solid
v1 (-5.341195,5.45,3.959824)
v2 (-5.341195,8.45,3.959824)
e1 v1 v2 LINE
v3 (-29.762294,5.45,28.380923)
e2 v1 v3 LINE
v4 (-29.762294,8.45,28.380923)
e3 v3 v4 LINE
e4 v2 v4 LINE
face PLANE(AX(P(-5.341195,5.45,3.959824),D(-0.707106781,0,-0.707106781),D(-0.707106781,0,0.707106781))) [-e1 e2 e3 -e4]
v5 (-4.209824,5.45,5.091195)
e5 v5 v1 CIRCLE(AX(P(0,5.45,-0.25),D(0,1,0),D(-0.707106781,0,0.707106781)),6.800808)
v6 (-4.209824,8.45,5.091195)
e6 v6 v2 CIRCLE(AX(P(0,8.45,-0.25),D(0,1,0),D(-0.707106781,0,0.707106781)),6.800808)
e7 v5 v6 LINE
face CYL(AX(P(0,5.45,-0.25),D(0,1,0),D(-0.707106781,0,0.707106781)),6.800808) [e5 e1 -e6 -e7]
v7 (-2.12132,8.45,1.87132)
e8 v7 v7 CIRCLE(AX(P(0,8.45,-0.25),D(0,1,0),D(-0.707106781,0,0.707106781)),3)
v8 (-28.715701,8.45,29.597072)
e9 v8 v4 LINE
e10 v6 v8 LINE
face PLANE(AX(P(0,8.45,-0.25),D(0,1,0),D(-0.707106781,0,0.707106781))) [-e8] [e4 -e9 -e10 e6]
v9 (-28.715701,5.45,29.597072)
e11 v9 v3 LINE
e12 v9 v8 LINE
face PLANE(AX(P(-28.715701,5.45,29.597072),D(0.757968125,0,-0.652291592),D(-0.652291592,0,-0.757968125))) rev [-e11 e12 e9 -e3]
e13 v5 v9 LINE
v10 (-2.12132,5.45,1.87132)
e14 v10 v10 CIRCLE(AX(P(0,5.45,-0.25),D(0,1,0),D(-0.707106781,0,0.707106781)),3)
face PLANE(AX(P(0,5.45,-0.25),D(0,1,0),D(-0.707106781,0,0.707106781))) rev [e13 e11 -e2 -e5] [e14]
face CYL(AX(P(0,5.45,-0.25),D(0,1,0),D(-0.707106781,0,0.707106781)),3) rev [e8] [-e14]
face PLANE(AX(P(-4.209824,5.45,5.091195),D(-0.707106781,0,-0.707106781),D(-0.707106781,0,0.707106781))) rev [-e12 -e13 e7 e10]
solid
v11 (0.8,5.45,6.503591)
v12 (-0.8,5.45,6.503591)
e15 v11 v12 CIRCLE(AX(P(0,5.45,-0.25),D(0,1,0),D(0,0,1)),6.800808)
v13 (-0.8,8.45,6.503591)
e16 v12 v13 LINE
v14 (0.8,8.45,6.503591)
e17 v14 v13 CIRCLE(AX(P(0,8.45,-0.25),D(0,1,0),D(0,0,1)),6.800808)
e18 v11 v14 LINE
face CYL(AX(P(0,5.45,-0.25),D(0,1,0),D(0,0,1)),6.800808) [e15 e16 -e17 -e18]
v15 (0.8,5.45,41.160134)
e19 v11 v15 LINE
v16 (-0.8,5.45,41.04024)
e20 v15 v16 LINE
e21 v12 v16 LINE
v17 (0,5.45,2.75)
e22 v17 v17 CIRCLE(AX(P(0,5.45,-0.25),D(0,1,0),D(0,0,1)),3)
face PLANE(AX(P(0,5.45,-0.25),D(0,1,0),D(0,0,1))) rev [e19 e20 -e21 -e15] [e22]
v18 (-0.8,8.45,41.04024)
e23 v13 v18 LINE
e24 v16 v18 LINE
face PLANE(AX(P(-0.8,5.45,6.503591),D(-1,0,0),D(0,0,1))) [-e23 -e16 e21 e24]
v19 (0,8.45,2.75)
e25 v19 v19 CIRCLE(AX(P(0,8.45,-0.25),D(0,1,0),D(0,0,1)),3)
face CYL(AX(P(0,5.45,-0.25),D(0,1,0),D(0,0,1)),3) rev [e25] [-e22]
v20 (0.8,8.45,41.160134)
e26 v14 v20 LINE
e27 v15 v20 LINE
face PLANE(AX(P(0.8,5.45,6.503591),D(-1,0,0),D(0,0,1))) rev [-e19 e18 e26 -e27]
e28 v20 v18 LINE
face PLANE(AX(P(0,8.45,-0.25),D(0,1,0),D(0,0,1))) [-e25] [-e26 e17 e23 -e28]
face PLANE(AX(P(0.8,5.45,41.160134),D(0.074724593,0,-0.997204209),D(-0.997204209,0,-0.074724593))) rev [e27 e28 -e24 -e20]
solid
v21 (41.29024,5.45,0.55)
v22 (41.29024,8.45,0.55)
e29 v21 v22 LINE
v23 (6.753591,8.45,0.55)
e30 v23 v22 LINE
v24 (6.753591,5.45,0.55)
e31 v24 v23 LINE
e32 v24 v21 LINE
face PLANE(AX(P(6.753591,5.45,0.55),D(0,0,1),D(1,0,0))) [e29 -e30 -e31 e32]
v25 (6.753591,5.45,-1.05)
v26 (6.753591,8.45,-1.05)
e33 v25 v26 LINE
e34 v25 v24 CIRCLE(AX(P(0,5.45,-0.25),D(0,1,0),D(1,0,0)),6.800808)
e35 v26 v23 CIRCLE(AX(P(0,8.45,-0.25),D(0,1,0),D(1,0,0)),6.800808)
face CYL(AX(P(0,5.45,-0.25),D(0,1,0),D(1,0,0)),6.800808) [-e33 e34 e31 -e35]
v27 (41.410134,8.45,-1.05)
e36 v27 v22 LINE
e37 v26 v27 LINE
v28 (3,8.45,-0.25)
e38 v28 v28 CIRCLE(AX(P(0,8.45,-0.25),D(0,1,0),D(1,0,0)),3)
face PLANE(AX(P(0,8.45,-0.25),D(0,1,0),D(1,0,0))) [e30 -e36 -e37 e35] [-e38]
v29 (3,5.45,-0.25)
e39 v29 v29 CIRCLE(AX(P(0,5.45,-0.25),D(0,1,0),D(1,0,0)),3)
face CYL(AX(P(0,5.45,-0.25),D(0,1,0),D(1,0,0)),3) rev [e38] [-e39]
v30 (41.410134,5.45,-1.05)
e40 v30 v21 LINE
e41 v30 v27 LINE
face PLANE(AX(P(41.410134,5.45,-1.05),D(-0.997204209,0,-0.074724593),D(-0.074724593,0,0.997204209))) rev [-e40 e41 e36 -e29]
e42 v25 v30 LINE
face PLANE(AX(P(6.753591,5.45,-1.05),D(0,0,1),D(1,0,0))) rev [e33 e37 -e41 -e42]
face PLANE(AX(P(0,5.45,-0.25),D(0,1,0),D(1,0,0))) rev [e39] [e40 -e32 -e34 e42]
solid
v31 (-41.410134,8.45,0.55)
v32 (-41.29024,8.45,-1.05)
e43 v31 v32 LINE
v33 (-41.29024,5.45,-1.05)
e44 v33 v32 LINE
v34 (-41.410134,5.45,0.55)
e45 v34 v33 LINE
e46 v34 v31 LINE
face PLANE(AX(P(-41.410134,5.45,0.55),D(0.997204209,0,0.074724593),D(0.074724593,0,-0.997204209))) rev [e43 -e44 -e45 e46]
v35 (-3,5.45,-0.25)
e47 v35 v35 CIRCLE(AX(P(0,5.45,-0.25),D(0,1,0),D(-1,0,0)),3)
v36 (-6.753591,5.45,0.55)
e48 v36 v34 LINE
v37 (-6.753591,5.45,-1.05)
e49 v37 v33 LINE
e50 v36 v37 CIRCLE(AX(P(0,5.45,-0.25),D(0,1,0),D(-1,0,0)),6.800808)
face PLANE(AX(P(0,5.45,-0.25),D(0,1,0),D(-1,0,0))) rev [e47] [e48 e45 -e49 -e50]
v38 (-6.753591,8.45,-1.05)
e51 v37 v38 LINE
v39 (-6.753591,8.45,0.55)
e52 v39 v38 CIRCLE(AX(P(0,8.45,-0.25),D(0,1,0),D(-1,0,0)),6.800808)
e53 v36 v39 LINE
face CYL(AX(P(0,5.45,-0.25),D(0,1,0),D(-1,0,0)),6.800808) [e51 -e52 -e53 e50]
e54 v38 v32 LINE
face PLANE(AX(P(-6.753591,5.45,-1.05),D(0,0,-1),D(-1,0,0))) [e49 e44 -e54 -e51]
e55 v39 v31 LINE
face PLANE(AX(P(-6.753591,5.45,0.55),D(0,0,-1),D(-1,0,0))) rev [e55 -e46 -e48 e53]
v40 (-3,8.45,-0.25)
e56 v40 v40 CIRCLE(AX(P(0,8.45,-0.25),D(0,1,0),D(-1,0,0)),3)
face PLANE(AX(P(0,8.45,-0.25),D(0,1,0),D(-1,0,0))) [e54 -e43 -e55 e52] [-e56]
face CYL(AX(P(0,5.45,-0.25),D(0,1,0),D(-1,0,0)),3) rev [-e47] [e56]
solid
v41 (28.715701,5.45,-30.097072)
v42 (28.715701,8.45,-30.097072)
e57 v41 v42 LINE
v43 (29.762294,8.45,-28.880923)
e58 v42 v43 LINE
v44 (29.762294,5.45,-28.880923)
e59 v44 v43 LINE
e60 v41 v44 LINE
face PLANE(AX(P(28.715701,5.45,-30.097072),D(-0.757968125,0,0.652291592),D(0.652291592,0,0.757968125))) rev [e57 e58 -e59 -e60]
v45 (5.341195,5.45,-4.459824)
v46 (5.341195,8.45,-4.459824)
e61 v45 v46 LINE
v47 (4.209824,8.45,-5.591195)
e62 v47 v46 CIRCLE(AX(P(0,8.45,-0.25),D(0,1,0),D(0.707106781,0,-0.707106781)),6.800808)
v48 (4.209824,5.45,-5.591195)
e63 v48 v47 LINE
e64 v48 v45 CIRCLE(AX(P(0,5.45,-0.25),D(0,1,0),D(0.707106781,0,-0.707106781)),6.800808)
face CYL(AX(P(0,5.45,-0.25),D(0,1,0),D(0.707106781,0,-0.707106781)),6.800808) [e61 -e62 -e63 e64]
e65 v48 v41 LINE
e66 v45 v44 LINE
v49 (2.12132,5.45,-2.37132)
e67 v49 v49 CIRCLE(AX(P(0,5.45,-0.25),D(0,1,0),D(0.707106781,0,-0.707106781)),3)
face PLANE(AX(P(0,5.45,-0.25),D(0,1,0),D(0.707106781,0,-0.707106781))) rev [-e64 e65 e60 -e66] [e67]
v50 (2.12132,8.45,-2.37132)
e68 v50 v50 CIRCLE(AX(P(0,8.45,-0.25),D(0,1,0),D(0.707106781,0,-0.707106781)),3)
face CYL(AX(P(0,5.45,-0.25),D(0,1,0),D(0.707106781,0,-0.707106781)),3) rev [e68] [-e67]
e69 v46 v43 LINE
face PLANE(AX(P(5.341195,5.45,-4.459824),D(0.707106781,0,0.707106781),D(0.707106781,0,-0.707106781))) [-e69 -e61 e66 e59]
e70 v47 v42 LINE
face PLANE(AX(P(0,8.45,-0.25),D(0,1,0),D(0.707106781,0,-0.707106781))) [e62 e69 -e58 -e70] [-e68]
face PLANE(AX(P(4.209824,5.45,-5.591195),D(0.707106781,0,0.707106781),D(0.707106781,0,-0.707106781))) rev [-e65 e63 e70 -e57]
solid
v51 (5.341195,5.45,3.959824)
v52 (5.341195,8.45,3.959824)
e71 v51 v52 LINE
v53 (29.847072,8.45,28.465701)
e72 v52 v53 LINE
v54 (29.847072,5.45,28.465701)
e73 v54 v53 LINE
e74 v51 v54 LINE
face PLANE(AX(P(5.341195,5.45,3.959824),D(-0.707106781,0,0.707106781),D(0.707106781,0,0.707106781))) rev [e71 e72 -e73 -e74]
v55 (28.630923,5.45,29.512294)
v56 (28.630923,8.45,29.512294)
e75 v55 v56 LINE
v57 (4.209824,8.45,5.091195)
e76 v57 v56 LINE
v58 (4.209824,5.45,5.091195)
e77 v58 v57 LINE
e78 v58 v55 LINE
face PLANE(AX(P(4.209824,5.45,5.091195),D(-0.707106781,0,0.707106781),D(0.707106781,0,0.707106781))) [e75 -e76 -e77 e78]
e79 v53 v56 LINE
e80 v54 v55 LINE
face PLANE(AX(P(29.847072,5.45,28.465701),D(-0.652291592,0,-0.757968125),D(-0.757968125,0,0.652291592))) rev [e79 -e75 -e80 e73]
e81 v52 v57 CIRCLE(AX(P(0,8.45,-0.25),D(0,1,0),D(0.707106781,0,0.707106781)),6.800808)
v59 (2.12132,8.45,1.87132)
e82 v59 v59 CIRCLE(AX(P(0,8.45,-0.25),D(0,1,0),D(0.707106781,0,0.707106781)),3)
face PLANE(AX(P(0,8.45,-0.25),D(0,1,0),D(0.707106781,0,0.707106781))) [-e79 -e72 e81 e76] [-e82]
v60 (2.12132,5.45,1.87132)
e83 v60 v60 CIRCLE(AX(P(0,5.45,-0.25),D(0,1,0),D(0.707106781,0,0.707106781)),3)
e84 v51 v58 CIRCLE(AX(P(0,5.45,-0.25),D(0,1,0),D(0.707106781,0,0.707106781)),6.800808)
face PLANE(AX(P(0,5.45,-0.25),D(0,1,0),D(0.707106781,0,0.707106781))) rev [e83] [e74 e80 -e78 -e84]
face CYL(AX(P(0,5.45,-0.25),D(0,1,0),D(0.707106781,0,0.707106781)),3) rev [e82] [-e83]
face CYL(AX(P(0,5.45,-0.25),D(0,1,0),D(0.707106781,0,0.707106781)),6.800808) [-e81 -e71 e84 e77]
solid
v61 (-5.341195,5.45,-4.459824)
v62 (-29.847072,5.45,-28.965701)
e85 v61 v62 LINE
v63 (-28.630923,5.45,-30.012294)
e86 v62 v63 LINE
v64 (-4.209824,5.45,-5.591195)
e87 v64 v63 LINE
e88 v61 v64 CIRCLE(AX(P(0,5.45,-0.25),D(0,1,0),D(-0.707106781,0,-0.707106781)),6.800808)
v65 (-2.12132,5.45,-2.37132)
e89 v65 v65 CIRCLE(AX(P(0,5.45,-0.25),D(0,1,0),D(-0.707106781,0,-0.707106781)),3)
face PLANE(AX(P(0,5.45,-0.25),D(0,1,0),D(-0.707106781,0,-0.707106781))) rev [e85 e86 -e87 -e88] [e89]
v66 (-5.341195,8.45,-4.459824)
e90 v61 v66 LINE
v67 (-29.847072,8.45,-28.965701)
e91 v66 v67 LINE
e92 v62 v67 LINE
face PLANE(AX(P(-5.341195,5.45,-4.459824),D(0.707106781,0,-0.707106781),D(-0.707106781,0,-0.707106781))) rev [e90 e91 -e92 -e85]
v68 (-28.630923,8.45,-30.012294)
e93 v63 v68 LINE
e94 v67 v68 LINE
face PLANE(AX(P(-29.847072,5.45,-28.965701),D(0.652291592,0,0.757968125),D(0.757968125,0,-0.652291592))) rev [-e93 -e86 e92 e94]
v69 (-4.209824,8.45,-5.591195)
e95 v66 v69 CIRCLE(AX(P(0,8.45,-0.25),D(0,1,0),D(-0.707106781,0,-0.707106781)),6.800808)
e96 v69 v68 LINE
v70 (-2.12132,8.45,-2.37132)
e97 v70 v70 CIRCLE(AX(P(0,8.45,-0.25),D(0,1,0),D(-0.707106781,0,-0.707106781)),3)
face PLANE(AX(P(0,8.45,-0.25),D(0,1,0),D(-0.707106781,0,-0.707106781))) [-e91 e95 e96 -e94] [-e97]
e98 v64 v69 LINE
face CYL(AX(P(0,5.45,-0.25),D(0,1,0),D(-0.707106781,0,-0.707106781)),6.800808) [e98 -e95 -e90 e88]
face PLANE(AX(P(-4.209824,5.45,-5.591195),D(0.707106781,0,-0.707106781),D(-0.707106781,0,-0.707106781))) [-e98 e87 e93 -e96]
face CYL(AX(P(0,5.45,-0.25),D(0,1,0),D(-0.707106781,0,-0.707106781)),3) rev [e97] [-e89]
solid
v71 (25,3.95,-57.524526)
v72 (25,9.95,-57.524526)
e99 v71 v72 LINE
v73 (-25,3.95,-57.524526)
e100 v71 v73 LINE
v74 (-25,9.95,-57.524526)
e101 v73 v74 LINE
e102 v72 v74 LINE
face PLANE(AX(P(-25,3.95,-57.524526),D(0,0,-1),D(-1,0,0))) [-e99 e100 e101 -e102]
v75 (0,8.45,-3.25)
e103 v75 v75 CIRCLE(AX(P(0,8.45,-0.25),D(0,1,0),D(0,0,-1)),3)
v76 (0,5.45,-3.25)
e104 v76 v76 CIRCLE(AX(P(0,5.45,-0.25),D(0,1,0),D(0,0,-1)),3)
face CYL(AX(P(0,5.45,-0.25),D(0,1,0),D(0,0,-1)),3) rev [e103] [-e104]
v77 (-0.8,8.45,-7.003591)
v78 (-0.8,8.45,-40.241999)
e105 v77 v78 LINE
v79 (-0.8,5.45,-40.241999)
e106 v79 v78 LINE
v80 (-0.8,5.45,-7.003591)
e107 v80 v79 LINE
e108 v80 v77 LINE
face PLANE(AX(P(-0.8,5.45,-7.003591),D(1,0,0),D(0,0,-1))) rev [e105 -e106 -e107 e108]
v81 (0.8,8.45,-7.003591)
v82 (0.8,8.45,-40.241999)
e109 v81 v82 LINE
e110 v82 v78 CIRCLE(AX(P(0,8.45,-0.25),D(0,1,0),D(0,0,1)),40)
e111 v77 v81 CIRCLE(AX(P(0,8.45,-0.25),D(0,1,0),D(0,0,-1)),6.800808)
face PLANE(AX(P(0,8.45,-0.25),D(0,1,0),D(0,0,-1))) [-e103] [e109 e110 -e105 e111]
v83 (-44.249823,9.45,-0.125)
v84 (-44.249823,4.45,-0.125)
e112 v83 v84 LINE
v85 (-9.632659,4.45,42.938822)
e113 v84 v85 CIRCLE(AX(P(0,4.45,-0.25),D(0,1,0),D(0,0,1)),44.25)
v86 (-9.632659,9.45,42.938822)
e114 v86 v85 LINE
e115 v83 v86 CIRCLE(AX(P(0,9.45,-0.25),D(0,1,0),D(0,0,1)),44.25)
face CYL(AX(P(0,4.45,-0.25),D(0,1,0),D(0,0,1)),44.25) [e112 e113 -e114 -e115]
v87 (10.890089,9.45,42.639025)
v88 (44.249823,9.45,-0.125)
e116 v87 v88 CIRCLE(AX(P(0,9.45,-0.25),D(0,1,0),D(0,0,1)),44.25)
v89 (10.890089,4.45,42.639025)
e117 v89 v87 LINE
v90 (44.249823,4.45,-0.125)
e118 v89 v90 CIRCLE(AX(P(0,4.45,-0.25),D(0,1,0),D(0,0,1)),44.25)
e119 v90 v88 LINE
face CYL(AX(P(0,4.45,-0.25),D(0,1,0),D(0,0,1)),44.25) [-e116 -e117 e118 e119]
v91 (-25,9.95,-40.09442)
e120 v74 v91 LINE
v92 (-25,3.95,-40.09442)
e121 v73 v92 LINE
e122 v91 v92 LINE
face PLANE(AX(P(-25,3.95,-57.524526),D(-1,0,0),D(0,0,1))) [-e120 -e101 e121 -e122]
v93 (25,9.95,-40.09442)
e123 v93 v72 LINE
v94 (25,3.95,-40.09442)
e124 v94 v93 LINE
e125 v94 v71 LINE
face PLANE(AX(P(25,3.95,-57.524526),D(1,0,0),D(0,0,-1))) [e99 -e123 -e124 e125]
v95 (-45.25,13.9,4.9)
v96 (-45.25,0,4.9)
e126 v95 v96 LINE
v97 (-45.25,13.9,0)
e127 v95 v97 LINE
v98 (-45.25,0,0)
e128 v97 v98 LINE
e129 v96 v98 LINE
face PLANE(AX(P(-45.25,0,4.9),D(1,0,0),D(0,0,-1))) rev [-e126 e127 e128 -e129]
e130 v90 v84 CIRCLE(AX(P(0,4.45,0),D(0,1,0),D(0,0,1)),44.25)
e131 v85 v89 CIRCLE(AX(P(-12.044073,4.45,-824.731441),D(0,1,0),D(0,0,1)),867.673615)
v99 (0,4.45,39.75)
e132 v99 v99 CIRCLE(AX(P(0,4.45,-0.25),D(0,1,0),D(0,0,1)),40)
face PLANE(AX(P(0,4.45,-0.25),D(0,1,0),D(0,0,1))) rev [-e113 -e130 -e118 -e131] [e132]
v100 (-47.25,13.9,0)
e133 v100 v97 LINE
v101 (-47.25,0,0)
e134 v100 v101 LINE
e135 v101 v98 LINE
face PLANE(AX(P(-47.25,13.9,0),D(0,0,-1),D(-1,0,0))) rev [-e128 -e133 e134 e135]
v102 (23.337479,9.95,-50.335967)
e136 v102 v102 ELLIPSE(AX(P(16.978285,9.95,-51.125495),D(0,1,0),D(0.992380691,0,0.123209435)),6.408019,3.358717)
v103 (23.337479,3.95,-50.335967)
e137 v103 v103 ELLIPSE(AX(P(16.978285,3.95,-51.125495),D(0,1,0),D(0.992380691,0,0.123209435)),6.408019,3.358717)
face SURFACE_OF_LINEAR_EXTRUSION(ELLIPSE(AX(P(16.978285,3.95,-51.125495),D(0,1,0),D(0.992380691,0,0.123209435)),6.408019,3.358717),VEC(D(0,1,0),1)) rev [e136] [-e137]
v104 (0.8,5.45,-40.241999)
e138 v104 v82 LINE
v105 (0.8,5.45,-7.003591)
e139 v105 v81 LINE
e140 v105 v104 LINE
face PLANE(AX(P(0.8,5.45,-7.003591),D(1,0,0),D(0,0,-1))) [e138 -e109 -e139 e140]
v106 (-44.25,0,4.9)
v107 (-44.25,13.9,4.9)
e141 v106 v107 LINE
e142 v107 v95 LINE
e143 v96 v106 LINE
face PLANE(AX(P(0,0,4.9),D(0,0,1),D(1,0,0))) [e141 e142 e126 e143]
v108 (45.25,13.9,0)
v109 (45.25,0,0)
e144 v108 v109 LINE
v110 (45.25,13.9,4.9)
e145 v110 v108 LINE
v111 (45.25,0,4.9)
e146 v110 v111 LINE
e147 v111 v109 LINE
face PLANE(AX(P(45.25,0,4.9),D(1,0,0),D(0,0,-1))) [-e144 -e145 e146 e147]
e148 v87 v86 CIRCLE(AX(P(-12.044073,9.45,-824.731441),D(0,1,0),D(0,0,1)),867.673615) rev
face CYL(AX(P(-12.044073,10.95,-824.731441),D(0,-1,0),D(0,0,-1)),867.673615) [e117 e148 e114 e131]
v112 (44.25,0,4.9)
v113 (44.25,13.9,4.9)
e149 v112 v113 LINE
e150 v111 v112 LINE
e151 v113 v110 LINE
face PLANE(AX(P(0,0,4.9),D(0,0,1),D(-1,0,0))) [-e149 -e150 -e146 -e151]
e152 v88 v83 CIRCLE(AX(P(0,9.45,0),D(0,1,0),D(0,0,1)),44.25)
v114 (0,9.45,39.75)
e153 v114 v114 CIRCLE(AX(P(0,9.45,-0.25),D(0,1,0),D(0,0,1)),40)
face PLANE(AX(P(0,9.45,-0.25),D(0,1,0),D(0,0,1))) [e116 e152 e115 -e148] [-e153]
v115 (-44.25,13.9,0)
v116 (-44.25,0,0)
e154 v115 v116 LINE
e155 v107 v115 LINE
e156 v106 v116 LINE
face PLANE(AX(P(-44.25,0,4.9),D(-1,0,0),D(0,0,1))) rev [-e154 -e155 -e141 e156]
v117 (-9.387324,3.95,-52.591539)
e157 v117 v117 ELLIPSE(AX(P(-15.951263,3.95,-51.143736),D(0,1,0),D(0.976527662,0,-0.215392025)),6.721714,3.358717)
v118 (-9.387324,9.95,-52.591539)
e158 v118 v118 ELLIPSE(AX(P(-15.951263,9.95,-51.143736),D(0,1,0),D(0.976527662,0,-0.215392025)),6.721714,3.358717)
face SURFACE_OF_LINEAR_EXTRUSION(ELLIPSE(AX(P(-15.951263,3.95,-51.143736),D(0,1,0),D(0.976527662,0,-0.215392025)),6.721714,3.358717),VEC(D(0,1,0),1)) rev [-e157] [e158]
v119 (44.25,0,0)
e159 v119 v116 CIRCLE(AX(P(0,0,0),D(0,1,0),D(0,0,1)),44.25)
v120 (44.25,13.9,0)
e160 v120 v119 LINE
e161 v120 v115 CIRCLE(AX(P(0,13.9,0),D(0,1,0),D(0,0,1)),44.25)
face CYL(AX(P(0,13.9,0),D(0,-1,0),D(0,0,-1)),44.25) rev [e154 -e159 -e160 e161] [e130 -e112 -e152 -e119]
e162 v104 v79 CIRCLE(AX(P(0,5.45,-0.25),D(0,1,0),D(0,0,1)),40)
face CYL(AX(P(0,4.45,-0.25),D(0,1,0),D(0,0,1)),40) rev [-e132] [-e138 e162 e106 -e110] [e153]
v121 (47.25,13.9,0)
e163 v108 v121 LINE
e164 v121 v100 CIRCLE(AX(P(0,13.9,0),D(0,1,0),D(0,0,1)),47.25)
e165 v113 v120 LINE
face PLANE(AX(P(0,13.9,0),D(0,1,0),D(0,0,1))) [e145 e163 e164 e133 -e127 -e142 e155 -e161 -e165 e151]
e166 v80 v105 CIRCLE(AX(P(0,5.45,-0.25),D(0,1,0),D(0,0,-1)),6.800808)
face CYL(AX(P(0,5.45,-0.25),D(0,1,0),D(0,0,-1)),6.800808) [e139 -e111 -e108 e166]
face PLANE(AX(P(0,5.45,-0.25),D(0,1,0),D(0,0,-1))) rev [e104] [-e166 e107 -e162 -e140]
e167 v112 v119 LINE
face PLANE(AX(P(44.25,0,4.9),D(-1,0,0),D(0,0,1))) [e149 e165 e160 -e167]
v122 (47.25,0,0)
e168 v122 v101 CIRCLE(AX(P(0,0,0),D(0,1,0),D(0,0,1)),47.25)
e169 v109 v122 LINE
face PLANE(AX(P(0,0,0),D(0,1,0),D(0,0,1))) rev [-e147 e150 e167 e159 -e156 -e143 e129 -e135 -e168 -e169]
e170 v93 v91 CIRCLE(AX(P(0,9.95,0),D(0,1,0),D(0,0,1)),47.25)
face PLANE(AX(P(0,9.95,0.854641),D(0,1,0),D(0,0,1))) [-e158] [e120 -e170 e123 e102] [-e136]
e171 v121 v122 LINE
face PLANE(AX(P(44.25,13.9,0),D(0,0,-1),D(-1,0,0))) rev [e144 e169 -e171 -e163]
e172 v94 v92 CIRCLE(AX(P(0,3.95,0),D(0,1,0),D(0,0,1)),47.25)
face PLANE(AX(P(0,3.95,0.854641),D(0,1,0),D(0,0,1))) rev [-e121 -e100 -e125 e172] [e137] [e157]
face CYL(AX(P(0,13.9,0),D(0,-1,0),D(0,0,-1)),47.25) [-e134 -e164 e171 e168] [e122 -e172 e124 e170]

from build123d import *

# Parameters (mm, degrees)
BOSS_EXTRUDE1_DEPTH      = 13.9
SKETCH2_W                = 1
SKETCH2_H                = 13.9
BOSS_EXTRUDE2_DEPTH      = 4.9
BOSS_EXTRUDE3_DEPTH      = 2.5
BOSS_EXTRUDE3_DEPTH_BACK = 2.5
SKETCH5_R                = 44.25
SKETCH5_R_2              = 40
BOSS_EXTRUDE4_DEPTH      = 1.5
BOSS_EXTRUDE4_DEPTH_BACK = 1.5
SKETCH6_R                = 3
CIRPATTERN6_COUNT        = 8
CUT_EXTRUDE3_DEPTH       = 6.5
BOSS_EXTRUDE5_START      = -57.524525956
BOSS_EXTRUDE5_OUTLINE_W  = 50
BOSS_EXTRUDE5_OUTLINE_H  = 6
BOSS_EXTRUDE5_DEPTH      = 17.430106145
BOSS_EXTRUDE5_START_2    = 3.95
BOSS_EXTRUDE5_2_DEPTH    = 6
BOSS_EXTRUDE5_3_DEPTH    = 0.5
BOSS_EXTRUDE5_START_3    = 9.45
BOSS_EXTRUDE5_4_DEPTH    = 0.5
BOSS_EXTRUDE5_START_4    = 4.45
BOSS_EXTRUDE5_5_DEPTH    = 1
BOSS_EXTRUDE5_START_5    = 8.45
BOSS_EXTRUDE5_6_DEPTH    = 1


with BuildPart() as part:
    # Sketch1 → Boss-Extrude1 (new body)
    with BuildSketch(Plane(origin=(0, 0, 0), x_dir=(1, 0, 0), z_dir=(0, 1, 0))):
        with BuildLine():
            Line((-47.25, 0), (-44.25, 0))
            ThreePointArc((-44.25, 0), (0, 44.25), (44.25, 0))
            Line((44.25, 0), (47.25, 0))
            ThreePointArc((47.25, 0), (0, 47.25), (-47.25, 0))
        make_face()
    extrude(amount=BOSS_EXTRUDE1_DEPTH)

    # Sketch2 → Boss-Extrude2 (add)
    with BuildSketch(Plane.XY):
        with Locations((-44.75, 6.95)):
            Rectangle(SKETCH2_W, SKETCH2_H)
    boss_extrude2 = extrude(amount=BOSS_EXTRUDE2_DEPTH)

    # Mirror1: Boss-Extrude2 across plane
    add(boss_extrude2.mirror(Plane(origin=(0, 0, 0), x_dir=(0, 0, 1), z_dir=(1, 0, 0))))

    # Sketch5 → Boss-Extrude3 (add, two sides: drawn at the far end of the back side and taken through both)
    with BuildSketch(Plane(origin=(0, 6.95, 0), x_dir=(1, 0, 0), z_dir=(0, 1, 0)).offset(-BOSS_EXTRUDE3_DEPTH_BACK)):
        with Locations((0, 0.25)):
            Circle(SKETCH5_R)
        with Locations(Location((0, 0.25, 0), (0, 0, 270))):
            Circle(SKETCH5_R_2, mode=Mode.SUBTRACT)
    extrude(amount=BOSS_EXTRUDE3_DEPTH + BOSS_EXTRUDE3_DEPTH_BACK)

    # Sketch13 → Cut-Extrude3 (cut)
    with BuildSketch(Plane.XZ.offset(-4.45)):
        with BuildLine():
            ThreePointArc((-9.632658615, 42.938822489), (0.629601632, 42.849609407), (10.89008888, 42.639024985))
            ThreePointArc((10.89008888, 42.639024985), (0.646337647, 43.995279383), (-9.632658615, 42.938822489))
        make_face()
    extrude(amount=-CUT_EXTRUDE3_DEPTH, mode=Mode.SUBTRACT)



with BuildPart() as body_2:
    # Sketch6 → Boss-Extrude4 (new, two sides: drawn at the far end of the back side and taken through both)
    with BuildSketch(Plane(origin=(0, 6.95, 0), x_dir=(1, 0, 0), z_dir=(0, 1, 0)).offset(-BOSS_EXTRUDE4_DEPTH_BACK)):
        with BuildLine():
            Line((0.8, -6.503590715), (0.8, -41.16013429))
            Line((0.8, -41.16013429), (-0.8, -41.040239741))
            Line((-0.8, -41.040239741), (-0.8, -6.503590715))
            ThreePointArc((-0.8, -6.503590715), (0, 7.05080786), (0.8, -6.503590715))
        make_face()
        with Locations(Location((0, 0.25, 0), (0, 0, 270))):
            Circle(SKETCH6_R, mode=Mode.SUBTRACT)
    extrude(amount=BOSS_EXTRUDE4_DEPTH + BOSS_EXTRUDE4_DEPTH_BACK)


with BuildPart() as cirpattern6_1:
    # CirPattern6: pattern copy
    add(body_2.part.rotate(Axis((0, 0, -0.25), (0, 1, 0)), 1 * 360 / CIRPATTERN6_COUNT))


with BuildPart() as cirpattern6_2:
    # CirPattern6: pattern copy
    add(body_2.part.rotate(Axis((0, 0, -0.25), (0, 1, 0)), 2 * 360 / CIRPATTERN6_COUNT))


with BuildPart() as cirpattern6_3:
    # CirPattern6: pattern copy
    add(body_2.part.rotate(Axis((0, 0, -0.25), (0, 1, 0)), 3 * 360 / CIRPATTERN6_COUNT))


with BuildPart() as cirpattern6_4:
    # CirPattern6: pattern copy
    add(body_2.part.rotate(Axis((0, 0, -0.25), (0, 1, 0)), 4 * 360 / CIRPATTERN6_COUNT))


with BuildPart() as cirpattern6_5:
    # CirPattern6: pattern copy
    add(body_2.part.rotate(Axis((0, 0, -0.25), (0, 1, 0)), 5 * 360 / CIRPATTERN6_COUNT))


with BuildPart() as cirpattern6_6:
    # CirPattern6: pattern copy
    add(body_2.part.rotate(Axis((0, 0, -0.25), (0, 1, 0)), 6 * 360 / CIRPATTERN6_COUNT))


with BuildPart() as cirpattern6_7:
    # CirPattern6: pattern copy
    add(body_2.part.rotate(Axis((0, 0, -0.25), (0, 1, 0)), 7 * 360 / CIRPATTERN6_COUNT))


with BuildPart() as part_1:
    add(part.part)

    add(cirpattern6_4.part)  # Boss-Extrude5 merges CirPattern6_4
    # Boss-Extrude5: read off the stored shape, not the designer's step
    # Boss-Extrude5 outline → Boss-Extrude5 (add)
    with BuildSketch(Plane.XY.offset(BOSS_EXTRUDE5_START)):
        with Locations((0, 6.95)):
            Rectangle(BOSS_EXTRUDE5_OUTLINE_W, BOSS_EXTRUDE5_OUTLINE_H)
    extrude(amount=BOSS_EXTRUDE5_DEPTH)

    # Boss-Extrude5 2 outline → Boss-Extrude5 2 (cut)
    with BuildSketch(Plane(origin=(0, 0, 0), x_dir=(1, 0, 0), z_dir=(0, 1, 0)).offset(BOSS_EXTRUDE5_START_2)):
        with BuildLine():
            add(Edge.make_bspline(
                [(23.337479062, 50.335967124), (24.05424607, 56.109110558), (14.157071661, 54.406831366), (4.259897252, 52.704552175), (13.440304653, 48.633687932), (22.620712054, 44.562823689), (23.337479062, 50.335967124)],
                knots=[0, 0, 0, 2.094395102, 2.094395102, 4.188790205, 4.188790205, 6.283185307, 6.283185307, 6.283185307], degree=2, weights=[1, 0.5, 1, 0.5, 1, 0.5, 1]))
        make_face()
        with BuildLine():
            add(Edge.make_bspline(
                [(-9.387323733, 52.591539123), (-10.640360061, 58.272458064), (-19.859751334, 53.260293217), (-29.079142607, 48.24812837), (-18.606715006, 47.579374276), (-8.134287405, 46.910620181), (-9.387323733, 52.591539123)],
                knots=[0, 0, 0, 2.094395102, 2.094395102, 4.188790205, 4.188790205, 6.283185307, 6.283185307, 6.283185307], degree=2, weights=[1, 0.5, 1, 0.5, 1, 0.5, 1]))
        make_face()
        with BuildLine():
            Line((0.8, 40.094419811), (3.524515559, 40.094419811))
            ThreePointArc((3.524515559, 40.094419811), (2.163516495, 40.191447099), (0.8, 40.2419992))
            Line((0.8, 40.2419992), (0.8, 40.094419811))
        make_face()
        with BuildLine():
            Line((-0.8, 40.094419811), (-0.8, 40.2419992))
            ThreePointArc((-0.8, 40.2419992), (-2.163516495, 40.191447099), (-3.524515559, 40.094419811))
            Line((-3.524515559, 40.094419811), (-0.8, 40.094419811))
        make_face()
    extrude(amount=BOSS_EXTRUDE5_2_DEPTH, mode=Mode.SUBTRACT)

    # Boss-Extrude5 3 outline → Boss-Extrude5 3 (cut)
    with BuildSketch(Plane(origin=(0, 0, 0), x_dir=(1, 0, 0), z_dir=(0, 1, 0)).offset(BOSS_EXTRUDE5_START_2)):
        with BuildLine():
            ThreePointArc((0.8, 40.2419992), (2.163516495, 40.191447099), (3.524515559, 40.094419811))
            Line((3.524515559, 40.094419811), (18.721645227, 40.094419811))
            ThreePointArc((18.721645227, 40.094419811), (0, 44.25), (-18.721645227, 40.094419811))
            Line((-18.721645227, 40.094419811), (-3.524515559, 40.094419811))
            ThreePointArc((-3.524515559, 40.094419811), (-2.163516495, 40.191447099), (-0.8, 40.2419992))
            Line((-0.8, 40.2419992), (-0.8, 40.094419811))
            Line((-0.8, 40.094419811), (0.8, 40.094419811))
            Line((0.8, 40.094419811), (0.8, 40.2419992))
        make_face()
    extrude(amount=BOSS_EXTRUDE5_3_DEPTH, mode=Mode.SUBTRACT)

    # Boss-Extrude5 4 outline → Boss-Extrude5 4 (cut)
    with BuildSketch(Plane(origin=(0, 0, 0), x_dir=(1, 0, 0), z_dir=(0, 1, 0)).offset(BOSS_EXTRUDE5_START_3)):
        with BuildLine():
            ThreePointArc((0.8, 40.2419992), (2.163516495, 40.191447099), (3.524515559, 40.094419811))
            Line((3.524515559, 40.094419811), (18.721645227, 40.094419811))
            ThreePointArc((18.721645227, 40.094419811), (0, 44.25), (-18.721645227, 40.094419811))
            Line((-18.721645227, 40.094419811), (-3.524515559, 40.094419811))
            ThreePointArc((-3.524515559, 40.094419811), (-2.163516495, 40.191447099), (-0.8, 40.2419992))
            Line((-0.8, 40.2419992), (-0.8, 40.094419811))
            Line((-0.8, 40.094419811), (0.8, 40.094419811))
            Line((0.8, 40.094419811), (0.8, 40.2419992))
        make_face()
    extrude(amount=BOSS_EXTRUDE5_4_DEPTH, mode=Mode.SUBTRACT)

    # Boss-Extrude5 5 outline → Boss-Extrude5 5 (cut)
    with BuildSketch(Plane(origin=(0, 0, 0), x_dir=(1, 0, 0), z_dir=(0, 1, 0)).offset(BOSS_EXTRUDE5_START_4)):
        with BuildLine():
            Line((0.8, 40.094419811), (0.8, 40.2419992))
            ThreePointArc((0.8, 40.2419992), (0, 40.25), (-0.8, 40.2419992))
            Line((-0.8, 40.2419992), (-0.8, 40.094419811))
            Line((-0.8, 40.094419811), (0.8, 40.094419811))
        make_face()
    extrude(amount=BOSS_EXTRUDE5_5_DEPTH, mode=Mode.SUBTRACT)

    # Boss-Extrude5 6 outline → Boss-Extrude5 6 (cut)
    with BuildSketch(Plane(origin=(0, 0, 0), x_dir=(1, 0, 0), z_dir=(0, 1, 0)).offset(BOSS_EXTRUDE5_START_5)):
        with BuildLine():
            Line((0.8, 40.094419811), (0.8, 40.2419992))
            ThreePointArc((0.8, 40.2419992), (0, 40.25), (-0.8, 40.2419992))
            Line((-0.8, 40.2419992), (-0.8, 40.094419811))
            Line((-0.8, 40.094419811), (0.8, 40.094419811))
        make_face()
    extrude(amount=BOSS_EXTRUDE5_6_DEPTH, mode=Mode.SUBTRACT)


solid = Compound([body_2.part, cirpattern6_1.part, cirpattern6_2.part, cirpattern6_3.part, cirpattern6_5.part, cirpattern6_6.part, cirpattern6_7.part, part_1.part])
